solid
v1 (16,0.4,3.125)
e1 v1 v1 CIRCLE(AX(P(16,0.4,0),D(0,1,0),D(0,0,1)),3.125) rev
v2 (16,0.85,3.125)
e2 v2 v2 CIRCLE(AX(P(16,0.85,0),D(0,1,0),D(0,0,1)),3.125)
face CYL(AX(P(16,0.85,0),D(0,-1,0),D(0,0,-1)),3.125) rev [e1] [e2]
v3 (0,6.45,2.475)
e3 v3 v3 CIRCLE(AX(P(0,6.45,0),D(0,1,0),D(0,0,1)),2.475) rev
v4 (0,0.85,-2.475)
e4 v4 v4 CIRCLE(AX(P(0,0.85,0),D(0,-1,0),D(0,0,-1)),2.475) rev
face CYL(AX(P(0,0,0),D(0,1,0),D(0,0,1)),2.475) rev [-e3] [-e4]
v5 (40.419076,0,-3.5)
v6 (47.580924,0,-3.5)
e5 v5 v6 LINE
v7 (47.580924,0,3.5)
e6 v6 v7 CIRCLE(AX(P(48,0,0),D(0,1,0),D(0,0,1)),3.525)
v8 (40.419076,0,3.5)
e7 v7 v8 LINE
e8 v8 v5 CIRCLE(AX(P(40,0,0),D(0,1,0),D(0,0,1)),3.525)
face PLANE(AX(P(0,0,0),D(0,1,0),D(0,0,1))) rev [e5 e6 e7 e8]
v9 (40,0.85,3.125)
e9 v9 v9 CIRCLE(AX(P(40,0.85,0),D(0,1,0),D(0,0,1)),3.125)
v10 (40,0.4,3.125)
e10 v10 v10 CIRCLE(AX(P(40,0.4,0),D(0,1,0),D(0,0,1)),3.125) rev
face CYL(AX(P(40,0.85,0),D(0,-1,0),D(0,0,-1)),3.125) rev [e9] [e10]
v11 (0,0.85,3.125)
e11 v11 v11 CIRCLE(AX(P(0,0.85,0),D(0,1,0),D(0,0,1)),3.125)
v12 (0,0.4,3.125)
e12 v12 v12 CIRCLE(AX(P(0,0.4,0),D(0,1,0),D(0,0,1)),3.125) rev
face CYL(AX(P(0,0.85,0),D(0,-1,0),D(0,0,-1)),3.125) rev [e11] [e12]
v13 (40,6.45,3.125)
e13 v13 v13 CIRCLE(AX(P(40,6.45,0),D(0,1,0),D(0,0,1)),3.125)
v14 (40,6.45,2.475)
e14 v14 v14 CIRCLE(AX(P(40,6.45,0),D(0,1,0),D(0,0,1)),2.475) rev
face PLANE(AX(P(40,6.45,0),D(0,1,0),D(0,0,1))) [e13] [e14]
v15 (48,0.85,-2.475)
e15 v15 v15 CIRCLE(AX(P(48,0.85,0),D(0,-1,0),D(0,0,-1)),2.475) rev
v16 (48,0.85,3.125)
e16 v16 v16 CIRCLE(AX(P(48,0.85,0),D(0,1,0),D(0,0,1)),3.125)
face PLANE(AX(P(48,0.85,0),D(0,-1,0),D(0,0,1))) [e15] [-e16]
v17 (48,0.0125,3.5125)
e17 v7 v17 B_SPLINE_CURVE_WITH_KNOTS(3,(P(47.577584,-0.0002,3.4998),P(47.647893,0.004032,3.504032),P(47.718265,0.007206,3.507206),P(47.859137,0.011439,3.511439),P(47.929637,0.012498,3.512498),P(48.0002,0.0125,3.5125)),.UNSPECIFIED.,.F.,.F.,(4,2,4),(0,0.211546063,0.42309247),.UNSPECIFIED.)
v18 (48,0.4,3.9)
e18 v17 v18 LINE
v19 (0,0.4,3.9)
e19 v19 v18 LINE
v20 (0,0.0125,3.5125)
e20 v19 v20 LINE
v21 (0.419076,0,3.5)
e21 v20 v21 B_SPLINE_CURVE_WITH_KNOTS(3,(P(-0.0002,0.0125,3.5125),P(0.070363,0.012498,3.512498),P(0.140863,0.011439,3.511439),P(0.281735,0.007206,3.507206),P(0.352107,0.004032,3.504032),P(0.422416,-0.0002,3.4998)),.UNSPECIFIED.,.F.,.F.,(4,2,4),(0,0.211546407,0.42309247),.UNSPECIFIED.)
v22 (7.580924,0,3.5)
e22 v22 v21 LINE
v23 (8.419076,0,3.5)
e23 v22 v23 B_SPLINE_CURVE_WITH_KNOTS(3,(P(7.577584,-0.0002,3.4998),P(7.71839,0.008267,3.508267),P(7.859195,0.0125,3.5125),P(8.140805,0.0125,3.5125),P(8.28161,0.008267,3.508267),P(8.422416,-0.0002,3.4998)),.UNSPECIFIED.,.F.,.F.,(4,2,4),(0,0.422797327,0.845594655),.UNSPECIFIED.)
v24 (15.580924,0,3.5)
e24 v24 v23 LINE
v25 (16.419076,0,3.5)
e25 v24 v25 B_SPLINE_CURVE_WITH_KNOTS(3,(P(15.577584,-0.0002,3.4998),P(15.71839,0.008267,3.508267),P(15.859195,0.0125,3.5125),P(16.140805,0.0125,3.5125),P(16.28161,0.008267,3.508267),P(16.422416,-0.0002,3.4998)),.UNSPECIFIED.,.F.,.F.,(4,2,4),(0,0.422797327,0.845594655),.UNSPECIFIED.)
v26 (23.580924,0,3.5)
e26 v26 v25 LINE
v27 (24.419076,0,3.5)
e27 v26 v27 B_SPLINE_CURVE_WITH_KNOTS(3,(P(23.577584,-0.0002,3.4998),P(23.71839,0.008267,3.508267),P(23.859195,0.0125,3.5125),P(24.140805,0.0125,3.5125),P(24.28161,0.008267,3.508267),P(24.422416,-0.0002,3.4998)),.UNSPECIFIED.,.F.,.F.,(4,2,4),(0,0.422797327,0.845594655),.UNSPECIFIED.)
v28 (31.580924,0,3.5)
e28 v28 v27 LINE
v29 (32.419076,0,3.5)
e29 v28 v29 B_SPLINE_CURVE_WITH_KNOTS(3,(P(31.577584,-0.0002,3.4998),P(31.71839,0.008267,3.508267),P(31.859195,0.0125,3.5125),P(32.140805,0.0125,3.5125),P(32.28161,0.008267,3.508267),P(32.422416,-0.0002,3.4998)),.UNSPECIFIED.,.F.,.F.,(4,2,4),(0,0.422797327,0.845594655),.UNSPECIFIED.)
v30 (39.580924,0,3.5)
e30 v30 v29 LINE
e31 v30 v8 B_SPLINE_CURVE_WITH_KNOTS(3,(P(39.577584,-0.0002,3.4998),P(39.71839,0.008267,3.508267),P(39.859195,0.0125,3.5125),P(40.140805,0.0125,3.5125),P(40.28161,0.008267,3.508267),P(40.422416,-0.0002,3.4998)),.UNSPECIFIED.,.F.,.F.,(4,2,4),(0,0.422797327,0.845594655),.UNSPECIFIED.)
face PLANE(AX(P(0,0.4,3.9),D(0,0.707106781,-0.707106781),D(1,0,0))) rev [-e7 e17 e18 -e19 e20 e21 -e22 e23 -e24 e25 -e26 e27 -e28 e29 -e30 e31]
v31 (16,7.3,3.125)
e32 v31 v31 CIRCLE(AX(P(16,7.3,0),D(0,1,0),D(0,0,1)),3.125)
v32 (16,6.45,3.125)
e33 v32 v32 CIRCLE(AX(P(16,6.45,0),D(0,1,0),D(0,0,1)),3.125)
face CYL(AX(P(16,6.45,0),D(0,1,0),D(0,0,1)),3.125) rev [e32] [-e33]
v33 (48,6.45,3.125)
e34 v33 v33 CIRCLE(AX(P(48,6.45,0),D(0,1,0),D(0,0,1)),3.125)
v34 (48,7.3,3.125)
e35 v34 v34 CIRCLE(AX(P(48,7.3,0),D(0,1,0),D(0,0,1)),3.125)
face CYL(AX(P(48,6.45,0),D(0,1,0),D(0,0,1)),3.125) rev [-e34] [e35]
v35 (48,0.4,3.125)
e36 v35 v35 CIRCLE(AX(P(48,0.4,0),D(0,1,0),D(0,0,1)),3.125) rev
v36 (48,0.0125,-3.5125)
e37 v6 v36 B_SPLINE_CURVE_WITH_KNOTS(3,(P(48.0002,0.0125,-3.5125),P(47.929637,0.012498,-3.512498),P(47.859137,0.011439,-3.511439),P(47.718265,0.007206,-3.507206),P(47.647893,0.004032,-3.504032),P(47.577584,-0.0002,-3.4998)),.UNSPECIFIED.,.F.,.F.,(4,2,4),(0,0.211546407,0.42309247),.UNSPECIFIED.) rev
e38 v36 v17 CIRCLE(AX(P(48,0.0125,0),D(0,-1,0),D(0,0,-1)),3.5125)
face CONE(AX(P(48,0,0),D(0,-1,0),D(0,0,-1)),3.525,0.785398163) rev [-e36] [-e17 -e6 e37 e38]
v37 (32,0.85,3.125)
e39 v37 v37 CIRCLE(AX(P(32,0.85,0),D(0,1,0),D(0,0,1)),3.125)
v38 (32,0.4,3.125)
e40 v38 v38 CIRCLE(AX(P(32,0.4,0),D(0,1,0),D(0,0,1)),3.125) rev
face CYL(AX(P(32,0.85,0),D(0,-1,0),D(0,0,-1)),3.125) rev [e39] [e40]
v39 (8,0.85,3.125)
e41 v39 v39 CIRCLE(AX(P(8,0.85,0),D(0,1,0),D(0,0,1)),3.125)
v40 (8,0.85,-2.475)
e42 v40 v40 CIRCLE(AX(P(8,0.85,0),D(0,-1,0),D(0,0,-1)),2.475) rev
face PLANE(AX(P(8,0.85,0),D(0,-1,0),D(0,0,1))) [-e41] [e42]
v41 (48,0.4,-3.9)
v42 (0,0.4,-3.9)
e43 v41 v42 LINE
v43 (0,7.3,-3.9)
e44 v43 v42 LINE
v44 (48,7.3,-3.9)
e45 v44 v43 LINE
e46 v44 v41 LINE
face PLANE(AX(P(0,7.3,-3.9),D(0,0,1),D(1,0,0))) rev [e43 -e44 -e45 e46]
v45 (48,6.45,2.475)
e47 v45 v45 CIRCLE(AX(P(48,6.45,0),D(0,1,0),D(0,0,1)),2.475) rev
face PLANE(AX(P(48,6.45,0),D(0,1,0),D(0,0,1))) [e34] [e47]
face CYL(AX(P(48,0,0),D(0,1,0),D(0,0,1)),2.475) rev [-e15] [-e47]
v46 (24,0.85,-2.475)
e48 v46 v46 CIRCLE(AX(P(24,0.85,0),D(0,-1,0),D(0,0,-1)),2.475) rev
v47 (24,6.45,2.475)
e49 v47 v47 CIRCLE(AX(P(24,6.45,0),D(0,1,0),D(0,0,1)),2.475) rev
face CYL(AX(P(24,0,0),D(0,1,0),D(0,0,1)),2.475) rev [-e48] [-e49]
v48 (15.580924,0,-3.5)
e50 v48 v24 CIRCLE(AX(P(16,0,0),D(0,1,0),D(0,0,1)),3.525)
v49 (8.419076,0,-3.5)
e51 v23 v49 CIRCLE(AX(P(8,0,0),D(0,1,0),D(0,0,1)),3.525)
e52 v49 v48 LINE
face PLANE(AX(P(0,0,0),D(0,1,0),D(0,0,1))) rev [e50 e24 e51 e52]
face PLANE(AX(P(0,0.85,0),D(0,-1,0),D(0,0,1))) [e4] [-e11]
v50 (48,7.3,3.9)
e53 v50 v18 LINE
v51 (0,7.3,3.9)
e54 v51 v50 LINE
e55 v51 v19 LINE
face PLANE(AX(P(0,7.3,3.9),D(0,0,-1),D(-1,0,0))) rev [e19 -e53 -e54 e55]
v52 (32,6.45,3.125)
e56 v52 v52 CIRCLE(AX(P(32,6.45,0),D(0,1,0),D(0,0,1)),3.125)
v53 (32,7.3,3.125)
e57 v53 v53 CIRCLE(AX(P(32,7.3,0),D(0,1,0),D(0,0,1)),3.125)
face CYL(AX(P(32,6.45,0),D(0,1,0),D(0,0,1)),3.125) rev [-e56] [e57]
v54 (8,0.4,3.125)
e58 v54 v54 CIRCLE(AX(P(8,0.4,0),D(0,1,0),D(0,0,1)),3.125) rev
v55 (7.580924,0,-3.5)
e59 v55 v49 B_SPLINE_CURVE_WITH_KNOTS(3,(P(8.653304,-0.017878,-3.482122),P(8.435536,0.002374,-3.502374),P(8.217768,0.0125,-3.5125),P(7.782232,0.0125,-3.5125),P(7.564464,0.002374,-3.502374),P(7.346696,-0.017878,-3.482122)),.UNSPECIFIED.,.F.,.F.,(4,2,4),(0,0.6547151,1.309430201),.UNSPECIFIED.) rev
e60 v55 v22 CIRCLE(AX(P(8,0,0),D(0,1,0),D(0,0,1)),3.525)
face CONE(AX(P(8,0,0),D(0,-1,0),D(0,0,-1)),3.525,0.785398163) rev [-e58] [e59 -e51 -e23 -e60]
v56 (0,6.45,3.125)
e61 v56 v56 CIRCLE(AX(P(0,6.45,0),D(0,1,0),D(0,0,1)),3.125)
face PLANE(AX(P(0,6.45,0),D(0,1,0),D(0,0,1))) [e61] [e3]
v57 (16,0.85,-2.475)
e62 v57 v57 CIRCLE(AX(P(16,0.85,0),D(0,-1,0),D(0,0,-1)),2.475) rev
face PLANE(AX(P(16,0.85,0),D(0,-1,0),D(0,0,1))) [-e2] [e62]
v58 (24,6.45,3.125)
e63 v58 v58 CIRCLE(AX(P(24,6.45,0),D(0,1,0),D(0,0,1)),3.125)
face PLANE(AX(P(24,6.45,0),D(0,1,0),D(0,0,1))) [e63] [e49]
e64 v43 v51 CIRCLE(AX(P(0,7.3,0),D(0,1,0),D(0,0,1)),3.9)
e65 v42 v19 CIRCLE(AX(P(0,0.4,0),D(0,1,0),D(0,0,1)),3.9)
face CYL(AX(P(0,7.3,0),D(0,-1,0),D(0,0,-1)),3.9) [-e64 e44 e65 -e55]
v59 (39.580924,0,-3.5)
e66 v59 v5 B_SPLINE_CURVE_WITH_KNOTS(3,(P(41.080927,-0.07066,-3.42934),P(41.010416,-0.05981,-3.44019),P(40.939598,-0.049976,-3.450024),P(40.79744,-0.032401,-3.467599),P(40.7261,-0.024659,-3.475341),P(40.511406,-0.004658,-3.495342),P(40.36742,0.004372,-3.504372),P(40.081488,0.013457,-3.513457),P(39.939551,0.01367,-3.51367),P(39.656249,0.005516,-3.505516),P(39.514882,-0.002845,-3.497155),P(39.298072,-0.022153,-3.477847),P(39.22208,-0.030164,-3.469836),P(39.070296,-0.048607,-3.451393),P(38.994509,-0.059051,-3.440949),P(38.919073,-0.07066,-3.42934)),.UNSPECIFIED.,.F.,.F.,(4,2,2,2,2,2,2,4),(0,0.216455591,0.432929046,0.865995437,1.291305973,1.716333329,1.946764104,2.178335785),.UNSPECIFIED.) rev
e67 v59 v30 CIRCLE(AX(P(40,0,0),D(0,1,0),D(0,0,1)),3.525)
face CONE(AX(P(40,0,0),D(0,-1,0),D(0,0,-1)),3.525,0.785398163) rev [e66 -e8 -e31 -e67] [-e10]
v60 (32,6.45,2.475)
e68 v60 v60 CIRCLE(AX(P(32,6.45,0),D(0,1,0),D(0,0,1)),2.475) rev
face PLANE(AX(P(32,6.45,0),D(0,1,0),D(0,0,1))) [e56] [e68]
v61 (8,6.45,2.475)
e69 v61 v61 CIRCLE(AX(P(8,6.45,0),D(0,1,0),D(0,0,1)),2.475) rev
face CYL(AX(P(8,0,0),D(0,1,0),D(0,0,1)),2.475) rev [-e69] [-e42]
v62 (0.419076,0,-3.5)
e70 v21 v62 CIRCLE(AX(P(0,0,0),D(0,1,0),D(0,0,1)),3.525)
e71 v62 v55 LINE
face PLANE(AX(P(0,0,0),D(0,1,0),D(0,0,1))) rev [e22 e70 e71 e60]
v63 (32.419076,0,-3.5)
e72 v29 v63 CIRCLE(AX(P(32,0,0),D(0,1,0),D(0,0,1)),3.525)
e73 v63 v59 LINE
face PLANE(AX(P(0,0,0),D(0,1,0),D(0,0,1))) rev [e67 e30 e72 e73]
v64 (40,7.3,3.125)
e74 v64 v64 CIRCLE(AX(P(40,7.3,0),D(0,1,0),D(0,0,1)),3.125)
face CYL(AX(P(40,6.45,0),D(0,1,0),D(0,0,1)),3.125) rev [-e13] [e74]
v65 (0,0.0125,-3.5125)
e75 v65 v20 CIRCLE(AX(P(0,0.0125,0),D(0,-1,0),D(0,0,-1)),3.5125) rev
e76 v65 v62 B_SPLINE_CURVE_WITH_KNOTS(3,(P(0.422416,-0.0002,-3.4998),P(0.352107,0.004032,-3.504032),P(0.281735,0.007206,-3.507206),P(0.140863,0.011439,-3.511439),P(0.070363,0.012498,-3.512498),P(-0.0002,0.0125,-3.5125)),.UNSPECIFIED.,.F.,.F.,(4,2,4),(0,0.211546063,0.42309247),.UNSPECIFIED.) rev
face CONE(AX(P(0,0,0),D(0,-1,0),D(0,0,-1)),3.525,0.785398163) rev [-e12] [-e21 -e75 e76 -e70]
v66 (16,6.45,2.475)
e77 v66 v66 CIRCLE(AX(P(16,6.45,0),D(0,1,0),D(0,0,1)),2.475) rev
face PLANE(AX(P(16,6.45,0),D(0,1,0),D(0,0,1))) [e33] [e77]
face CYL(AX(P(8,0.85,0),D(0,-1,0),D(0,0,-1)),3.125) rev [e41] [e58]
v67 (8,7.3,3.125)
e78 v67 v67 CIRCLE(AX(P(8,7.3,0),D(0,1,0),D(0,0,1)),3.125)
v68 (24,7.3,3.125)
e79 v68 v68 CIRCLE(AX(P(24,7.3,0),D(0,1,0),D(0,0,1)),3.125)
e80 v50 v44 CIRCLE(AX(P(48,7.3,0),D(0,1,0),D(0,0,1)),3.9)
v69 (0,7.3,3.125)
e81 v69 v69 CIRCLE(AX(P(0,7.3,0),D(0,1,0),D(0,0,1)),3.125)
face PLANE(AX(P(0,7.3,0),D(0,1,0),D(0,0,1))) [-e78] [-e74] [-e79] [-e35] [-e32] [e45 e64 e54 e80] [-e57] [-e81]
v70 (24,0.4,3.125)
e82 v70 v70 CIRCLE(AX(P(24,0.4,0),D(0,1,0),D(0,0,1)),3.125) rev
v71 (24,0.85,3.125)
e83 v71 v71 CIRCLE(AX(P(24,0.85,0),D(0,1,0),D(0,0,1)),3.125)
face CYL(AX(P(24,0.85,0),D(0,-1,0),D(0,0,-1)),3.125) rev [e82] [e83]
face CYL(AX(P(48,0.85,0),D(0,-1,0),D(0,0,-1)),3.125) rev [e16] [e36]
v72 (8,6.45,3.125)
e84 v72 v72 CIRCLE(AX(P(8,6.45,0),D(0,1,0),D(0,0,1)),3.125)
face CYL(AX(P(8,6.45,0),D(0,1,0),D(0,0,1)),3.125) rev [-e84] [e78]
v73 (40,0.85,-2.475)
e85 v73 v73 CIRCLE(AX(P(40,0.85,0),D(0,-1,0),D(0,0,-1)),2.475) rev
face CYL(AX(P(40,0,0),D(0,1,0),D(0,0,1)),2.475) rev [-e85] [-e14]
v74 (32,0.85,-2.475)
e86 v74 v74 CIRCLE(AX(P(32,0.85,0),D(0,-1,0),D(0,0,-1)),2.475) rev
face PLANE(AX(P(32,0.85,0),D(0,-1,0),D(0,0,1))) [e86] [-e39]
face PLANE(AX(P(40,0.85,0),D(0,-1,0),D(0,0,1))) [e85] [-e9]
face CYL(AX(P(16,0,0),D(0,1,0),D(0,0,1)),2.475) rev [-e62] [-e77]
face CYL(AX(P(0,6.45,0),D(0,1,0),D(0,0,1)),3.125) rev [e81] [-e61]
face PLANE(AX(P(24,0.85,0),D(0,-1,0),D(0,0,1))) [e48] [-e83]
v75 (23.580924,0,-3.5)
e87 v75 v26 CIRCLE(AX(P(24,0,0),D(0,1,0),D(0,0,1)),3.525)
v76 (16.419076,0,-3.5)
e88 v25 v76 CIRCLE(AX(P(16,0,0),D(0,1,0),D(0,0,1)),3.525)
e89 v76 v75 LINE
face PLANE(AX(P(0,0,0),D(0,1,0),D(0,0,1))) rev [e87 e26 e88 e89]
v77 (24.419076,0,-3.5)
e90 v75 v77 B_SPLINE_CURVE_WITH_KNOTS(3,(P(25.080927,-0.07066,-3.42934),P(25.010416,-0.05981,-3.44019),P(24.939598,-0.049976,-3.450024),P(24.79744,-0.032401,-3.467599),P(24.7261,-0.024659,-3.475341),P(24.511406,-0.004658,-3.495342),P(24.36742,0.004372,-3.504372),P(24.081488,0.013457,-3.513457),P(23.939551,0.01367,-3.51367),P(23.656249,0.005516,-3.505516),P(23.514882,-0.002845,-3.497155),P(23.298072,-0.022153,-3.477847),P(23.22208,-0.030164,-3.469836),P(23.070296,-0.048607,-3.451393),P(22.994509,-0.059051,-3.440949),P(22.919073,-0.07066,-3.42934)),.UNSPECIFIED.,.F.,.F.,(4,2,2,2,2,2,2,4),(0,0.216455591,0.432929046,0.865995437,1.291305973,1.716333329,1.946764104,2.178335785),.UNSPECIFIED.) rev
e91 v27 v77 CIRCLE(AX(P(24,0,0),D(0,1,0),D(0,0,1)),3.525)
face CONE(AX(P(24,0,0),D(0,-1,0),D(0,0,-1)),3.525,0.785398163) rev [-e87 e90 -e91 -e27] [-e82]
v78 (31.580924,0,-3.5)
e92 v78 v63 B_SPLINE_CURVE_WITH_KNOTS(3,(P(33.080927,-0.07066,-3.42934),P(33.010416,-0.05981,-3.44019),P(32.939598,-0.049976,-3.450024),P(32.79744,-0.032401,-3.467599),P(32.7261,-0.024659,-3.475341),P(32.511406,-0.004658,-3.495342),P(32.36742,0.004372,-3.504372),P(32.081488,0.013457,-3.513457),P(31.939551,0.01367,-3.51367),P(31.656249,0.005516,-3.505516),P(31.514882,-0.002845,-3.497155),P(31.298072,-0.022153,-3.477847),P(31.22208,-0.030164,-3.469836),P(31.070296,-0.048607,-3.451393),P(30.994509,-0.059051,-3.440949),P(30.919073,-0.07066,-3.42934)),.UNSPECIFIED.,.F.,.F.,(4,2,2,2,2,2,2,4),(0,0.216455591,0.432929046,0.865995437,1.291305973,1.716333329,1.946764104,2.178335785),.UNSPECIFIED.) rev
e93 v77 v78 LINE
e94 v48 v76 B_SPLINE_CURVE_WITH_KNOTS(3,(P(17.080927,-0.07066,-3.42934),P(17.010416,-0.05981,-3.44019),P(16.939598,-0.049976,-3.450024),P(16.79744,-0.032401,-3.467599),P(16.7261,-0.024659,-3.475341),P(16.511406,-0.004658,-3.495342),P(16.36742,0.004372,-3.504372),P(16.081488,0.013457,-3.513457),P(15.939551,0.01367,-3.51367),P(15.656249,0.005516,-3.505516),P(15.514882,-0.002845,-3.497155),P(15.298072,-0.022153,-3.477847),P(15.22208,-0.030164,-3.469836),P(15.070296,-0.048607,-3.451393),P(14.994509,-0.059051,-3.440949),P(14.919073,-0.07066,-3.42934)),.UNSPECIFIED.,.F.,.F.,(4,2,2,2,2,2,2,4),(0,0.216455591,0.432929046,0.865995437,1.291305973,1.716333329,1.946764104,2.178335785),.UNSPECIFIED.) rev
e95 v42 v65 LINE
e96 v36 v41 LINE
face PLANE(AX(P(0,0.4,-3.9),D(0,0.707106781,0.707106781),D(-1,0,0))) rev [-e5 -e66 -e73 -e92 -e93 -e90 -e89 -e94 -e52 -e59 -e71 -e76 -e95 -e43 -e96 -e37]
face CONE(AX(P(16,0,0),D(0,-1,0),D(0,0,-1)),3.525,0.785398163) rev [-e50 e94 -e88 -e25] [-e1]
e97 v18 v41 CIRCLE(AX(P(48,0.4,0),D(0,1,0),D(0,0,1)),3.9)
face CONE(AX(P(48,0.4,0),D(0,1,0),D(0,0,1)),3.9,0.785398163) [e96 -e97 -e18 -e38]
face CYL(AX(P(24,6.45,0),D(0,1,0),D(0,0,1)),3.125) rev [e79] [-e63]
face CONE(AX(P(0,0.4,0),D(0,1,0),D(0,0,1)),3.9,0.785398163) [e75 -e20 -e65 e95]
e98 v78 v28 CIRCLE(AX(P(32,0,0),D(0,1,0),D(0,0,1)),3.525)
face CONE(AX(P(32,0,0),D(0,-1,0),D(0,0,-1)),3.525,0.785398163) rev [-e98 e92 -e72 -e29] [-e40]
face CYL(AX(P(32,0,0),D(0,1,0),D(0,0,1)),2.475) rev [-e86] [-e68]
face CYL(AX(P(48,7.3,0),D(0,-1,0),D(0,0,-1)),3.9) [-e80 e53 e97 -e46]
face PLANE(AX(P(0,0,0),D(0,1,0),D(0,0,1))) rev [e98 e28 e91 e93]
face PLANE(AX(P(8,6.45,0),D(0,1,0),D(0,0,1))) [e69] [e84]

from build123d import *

# Parameters (mm, degrees)
BOSS_EXTRUDE1_DEPTH       = 7.3
SKETCH2_R                 = 2.475
CUT_EXTRUDE1_DEPTH        = 53.555779891
SKETCH3_R                 = 3.125
CUT_EXTRUDE2_DEPTH        = 0.85
LPATTERN1_COUNT           = 7
LPATTERN1_PITCH           = 8
LPATTERN1_COPY_1_SKETCH_R = 3.125
LPATTERN1_COPY_1_DEPTH    = 0.85
LPATTERN1_COPY_2_SKETCH_R = 3.125
LPATTERN1_COPY_2_DEPTH    = 0.85
LPATTERN1_COPY_3_SKETCH_R = 3.125
LPATTERN1_COPY_3_DEPTH    = 0.85
LPATTERN1_COPY_4_SKETCH_R = 3.125
LPATTERN1_COPY_4_DEPTH    = 0.85
LPATTERN1_COPY_5_SKETCH_R = 3.125
LPATTERN1_COPY_5_DEPTH    = 0.85
LPATTERN1_COPY_6_SKETCH_R = 3.125
LPATTERN1_COPY_6_DEPTH    = 0.85
CHAMFER1_SIZE             = 0.4


with BuildPart() as part:
    # Sketch1 → Boss-Extrude1 (new body)
    with BuildSketch(Plane(origin=(0, 0, 0), x_dir=(1, 0, 0), z_dir=(0, 1, 0))):
        with BuildLine():
            Line((0, 3.9), (48, 3.9))
            ThreePointArc((48, 3.9), (51.9, 0), (48, -3.9))
            Line((48, -3.9), (0, -3.9))
            ThreePointArc((0, -3.9), (-3.9, 0), (0, 3.9))
        make_face()
    extrude(amount=BOSS_EXTRUDE1_DEPTH)

    # Sketch2 → Cut-Extrude1 (cut, through all)
    with BuildSketch(Plane(origin=(0, 7.3, 0), x_dir=(1, 0, 0), z_dir=(0, 1, 0))):
        with Locations(Location((0, 0, 0), (0, 0, 270))):
            Circle(SKETCH2_R)
    cut_extrude1 = extrude(amount=-CUT_EXTRUDE1_DEPTH, mode=Mode.SUBTRACT)

    # Sketch3 → Cut-Extrude2 (cut)
    with BuildSketch(Plane(origin=(0, 7.3, 0), x_dir=(1, 0, 0), z_dir=(0, 1, 0))):
        with Locations(Location((0, 0, 0), (0, 0, 270))):
            Circle(SKETCH3_R)
    cut_extrude2 = extrude(amount=-CUT_EXTRUDE2_DEPTH, mode=Mode.SUBTRACT)

    # Mirror1: Cut-Extrude2 across plane
    add(cut_extrude2.mirror(Plane.ZX.offset(3.65)), mode=Mode.SUBTRACT)

    # LPattern1: Cut-Extrude1, Cut-Extrude2 ×7
    with Locations(*[(i * LPATTERN1_PITCH, 0, 0) for i in range(1, LPATTERN1_COUNT)]):
        add(cut_extrude1, mode=Mode.SUBTRACT)
        add(cut_extrude2, mode=Mode.SUBTRACT)

    # LPattern1 copy 1 sketch → LPattern1 copy 1 (cut)
    with BuildSketch(Plane(origin=(8, 0, 0), x_dir=(1, 0, 0), z_dir=(0, -1, 0))):
        Circle(LPATTERN1_COPY_1_SKETCH_R)
    extrude(amount=-LPATTERN1_COPY_1_DEPTH, mode=Mode.SUBTRACT)

    # LPattern1 copy 2 sketch → LPattern1 copy 2 (cut)
    with BuildSketch(Plane(origin=(16, 0, 0), x_dir=(1, 0, 0), z_dir=(0, -1, 0))):
        Circle(LPATTERN1_COPY_2_SKETCH_R)
    extrude(amount=-LPATTERN1_COPY_2_DEPTH, mode=Mode.SUBTRACT)

    # LPattern1 copy 3 sketch → LPattern1 copy 3 (cut)
    with BuildSketch(Plane(origin=(24, 0, 0), x_dir=(1, 0, 0), z_dir=(0, -1, 0))):
        Circle(LPATTERN1_COPY_3_SKETCH_R)
    extrude(amount=-LPATTERN1_COPY_3_DEPTH, mode=Mode.SUBTRACT)

    # LPattern1 copy 4 sketch → LPattern1 copy 4 (cut)
    with BuildSketch(Plane(origin=(32, 0, 0), x_dir=(1, 0, 0), z_dir=(0, -1, 0))):
        Circle(LPATTERN1_COPY_4_SKETCH_R)
    extrude(amount=-LPATTERN1_COPY_4_DEPTH, mode=Mode.SUBTRACT)

    # LPattern1 copy 5 sketch → LPattern1 copy 5 (cut)
    with BuildSketch(Plane(origin=(40, 0, 0), x_dir=(1, 0, 0), z_dir=(0, -1, 0))):
        Circle(LPATTERN1_COPY_5_SKETCH_R)
    extrude(amount=-LPATTERN1_COPY_5_DEPTH, mode=Mode.SUBTRACT)

    # LPattern1 copy 6 sketch → LPattern1 copy 6 (cut)
    with BuildSketch(Plane(origin=(48, 0, 0), x_dir=(1, 0, 0), z_dir=(0, -1, 0))):
        Circle(LPATTERN1_COPY_6_SKETCH_R)
    extrude(amount=-LPATTERN1_COPY_6_DEPTH, mode=Mode.SUBTRACT)

    # Chamfer1
    # the kernel refuses this chamfer: 0.4 mm, written as the material it takes off along each edge
    with BuildSketch(Plane(origin=(16, 0, 0), x_dir=(1, 0, 0), z_dir=(0, 0, -1))) as chamfer1_piece_1:
        Polygon((3.125 + CHAMFER1_SIZE, 0), (3.125, -CHAMFER1_SIZE), (3.125, 0), align=None)
    revolve(axis=Axis((16, 0, 0), (0, -1, 0)), mode=Mode.SUBTRACT)
    with BuildSketch(Plane(origin=(24, 0, 0), x_dir=(1, 0, 0), z_dir=(0, 0, -1))) as chamfer1_piece_2:
        Polygon((3.125 + CHAMFER1_SIZE, 0), (3.125, -CHAMFER1_SIZE), (3.125, 0), align=None)
    revolve(axis=Axis((24, 0, 0), (0, -1, 0)), mode=Mode.SUBTRACT)
    with BuildSketch(Plane(origin=(32, 0, 0), x_dir=(1, 0, 0), z_dir=(0, 0, -1))) as chamfer1_piece_3:
        Polygon((3.125 + CHAMFER1_SIZE, 0), (3.125, -CHAMFER1_SIZE), (3.125, 0), align=None)
    revolve(axis=Axis((32, 0, 0), (0, -1, 0)), mode=Mode.SUBTRACT)
    with BuildSketch(Plane(origin=(40, 0, 0), x_dir=(1, 0, 0), z_dir=(0, 0, -1))) as chamfer1_piece_4:
        Polygon((3.125 + CHAMFER1_SIZE, 0), (3.125, -CHAMFER1_SIZE), (3.125, 0), align=None)
    revolve(axis=Axis((40, 0, 0), (0, -1, 0)), mode=Mode.SUBTRACT)
    with BuildSketch(Plane(origin=(48, 0, 0), x_dir=(1, 0, 0), z_dir=(0, 0, -1))) as chamfer1_piece_5:
        Polygon((3.125 + CHAMFER1_SIZE, 0), (3.125, -CHAMFER1_SIZE), (3.125, 0), align=None)
    revolve(axis=Axis((48, 0, 0), (0, -1, 0)), mode=Mode.SUBTRACT)
    with BuildSketch(Plane(origin=(0, 0, 0), x_dir=(0, 0, 1), z_dir=(-1, 0, 0))) as chamfer1_piece_6:
        Polygon((3.125 + CHAMFER1_SIZE, 0), (3.125, CHAMFER1_SIZE), (3.125, 0), align=None)
    revolve(axis=Axis((0, 0, 0), (0, 1, 0)), mode=Mode.SUBTRACT)
    with BuildSketch(Plane(origin=(0, 0, -3.9), x_dir=(0, 0.9996219169112968, -0.027495876610586275), z_dir=(1, 0, 0))) as chamfer1_piece_7:
        Polygon((CHAMFER1_SIZE * 0.999621916911, CHAMFER1_SIZE * 0.0274958766106), (-CHAMFER1_SIZE * 0.0274958766106, CHAMFER1_SIZE * 0.999621916911), (0, 0), align=None)
    extrude(amount=48, mode=Mode.SUBTRACT)
    with BuildSketch(Plane(origin=(48, 0, 0), x_dir=(0, 0, -1), z_dir=(-1, 0, 0))) as chamfer1_piece_8:
        Polygon((3.9, -CHAMFER1_SIZE), (3.9 - CHAMFER1_SIZE, 0), (3.9, 0), align=None)
    revolve(axis=Axis((48, 0, 0), (0, -1, 0)), revolution_arc=180, mode=Mode.SUBTRACT)
    with BuildSketch(Plane(origin=(48, 0, 3.9), x_dir=(0, -0.027495876610586386, -0.9996219169112968), z_dir=(-1, 0, 0))) as chamfer1_piece_9:
        Polygon((CHAMFER1_SIZE * 0.999621916911, -CHAMFER1_SIZE * 0.0274958766106), (-CHAMFER1_SIZE * 0.0274958766106, -CHAMFER1_SIZE * 0.999621916911), (0, 0), align=None)
    extrude(amount=48, mode=Mode.SUBTRACT)
    with BuildSketch(Plane(origin=(0, 0, 0), x_dir=(0, 0, 1), z_dir=(1, 0, 0))) as chamfer1_piece_10:
        Polygon((3.9, -CHAMFER1_SIZE), (3.9 - CHAMFER1_SIZE, 0), (3.9, 0), align=None)
    revolve(axis=Axis((0, 0, 0), (0, -1, 0)), revolution_arc=180, mode=Mode.SUBTRACT)
    with BuildSketch(Plane(origin=(8, 0, 0), x_dir=(1, 0, 0), z_dir=(0, 0, -1))) as chamfer1_piece_11:
        Polygon((3.125 + CHAMFER1_SIZE, 0), (3.125, -CHAMFER1_SIZE), (3.125, 0), align=None)
    revolve(axis=Axis((8, 0, 0), (0, -1, 0)), mode=Mode.SUBTRACT)


solid = part.part
